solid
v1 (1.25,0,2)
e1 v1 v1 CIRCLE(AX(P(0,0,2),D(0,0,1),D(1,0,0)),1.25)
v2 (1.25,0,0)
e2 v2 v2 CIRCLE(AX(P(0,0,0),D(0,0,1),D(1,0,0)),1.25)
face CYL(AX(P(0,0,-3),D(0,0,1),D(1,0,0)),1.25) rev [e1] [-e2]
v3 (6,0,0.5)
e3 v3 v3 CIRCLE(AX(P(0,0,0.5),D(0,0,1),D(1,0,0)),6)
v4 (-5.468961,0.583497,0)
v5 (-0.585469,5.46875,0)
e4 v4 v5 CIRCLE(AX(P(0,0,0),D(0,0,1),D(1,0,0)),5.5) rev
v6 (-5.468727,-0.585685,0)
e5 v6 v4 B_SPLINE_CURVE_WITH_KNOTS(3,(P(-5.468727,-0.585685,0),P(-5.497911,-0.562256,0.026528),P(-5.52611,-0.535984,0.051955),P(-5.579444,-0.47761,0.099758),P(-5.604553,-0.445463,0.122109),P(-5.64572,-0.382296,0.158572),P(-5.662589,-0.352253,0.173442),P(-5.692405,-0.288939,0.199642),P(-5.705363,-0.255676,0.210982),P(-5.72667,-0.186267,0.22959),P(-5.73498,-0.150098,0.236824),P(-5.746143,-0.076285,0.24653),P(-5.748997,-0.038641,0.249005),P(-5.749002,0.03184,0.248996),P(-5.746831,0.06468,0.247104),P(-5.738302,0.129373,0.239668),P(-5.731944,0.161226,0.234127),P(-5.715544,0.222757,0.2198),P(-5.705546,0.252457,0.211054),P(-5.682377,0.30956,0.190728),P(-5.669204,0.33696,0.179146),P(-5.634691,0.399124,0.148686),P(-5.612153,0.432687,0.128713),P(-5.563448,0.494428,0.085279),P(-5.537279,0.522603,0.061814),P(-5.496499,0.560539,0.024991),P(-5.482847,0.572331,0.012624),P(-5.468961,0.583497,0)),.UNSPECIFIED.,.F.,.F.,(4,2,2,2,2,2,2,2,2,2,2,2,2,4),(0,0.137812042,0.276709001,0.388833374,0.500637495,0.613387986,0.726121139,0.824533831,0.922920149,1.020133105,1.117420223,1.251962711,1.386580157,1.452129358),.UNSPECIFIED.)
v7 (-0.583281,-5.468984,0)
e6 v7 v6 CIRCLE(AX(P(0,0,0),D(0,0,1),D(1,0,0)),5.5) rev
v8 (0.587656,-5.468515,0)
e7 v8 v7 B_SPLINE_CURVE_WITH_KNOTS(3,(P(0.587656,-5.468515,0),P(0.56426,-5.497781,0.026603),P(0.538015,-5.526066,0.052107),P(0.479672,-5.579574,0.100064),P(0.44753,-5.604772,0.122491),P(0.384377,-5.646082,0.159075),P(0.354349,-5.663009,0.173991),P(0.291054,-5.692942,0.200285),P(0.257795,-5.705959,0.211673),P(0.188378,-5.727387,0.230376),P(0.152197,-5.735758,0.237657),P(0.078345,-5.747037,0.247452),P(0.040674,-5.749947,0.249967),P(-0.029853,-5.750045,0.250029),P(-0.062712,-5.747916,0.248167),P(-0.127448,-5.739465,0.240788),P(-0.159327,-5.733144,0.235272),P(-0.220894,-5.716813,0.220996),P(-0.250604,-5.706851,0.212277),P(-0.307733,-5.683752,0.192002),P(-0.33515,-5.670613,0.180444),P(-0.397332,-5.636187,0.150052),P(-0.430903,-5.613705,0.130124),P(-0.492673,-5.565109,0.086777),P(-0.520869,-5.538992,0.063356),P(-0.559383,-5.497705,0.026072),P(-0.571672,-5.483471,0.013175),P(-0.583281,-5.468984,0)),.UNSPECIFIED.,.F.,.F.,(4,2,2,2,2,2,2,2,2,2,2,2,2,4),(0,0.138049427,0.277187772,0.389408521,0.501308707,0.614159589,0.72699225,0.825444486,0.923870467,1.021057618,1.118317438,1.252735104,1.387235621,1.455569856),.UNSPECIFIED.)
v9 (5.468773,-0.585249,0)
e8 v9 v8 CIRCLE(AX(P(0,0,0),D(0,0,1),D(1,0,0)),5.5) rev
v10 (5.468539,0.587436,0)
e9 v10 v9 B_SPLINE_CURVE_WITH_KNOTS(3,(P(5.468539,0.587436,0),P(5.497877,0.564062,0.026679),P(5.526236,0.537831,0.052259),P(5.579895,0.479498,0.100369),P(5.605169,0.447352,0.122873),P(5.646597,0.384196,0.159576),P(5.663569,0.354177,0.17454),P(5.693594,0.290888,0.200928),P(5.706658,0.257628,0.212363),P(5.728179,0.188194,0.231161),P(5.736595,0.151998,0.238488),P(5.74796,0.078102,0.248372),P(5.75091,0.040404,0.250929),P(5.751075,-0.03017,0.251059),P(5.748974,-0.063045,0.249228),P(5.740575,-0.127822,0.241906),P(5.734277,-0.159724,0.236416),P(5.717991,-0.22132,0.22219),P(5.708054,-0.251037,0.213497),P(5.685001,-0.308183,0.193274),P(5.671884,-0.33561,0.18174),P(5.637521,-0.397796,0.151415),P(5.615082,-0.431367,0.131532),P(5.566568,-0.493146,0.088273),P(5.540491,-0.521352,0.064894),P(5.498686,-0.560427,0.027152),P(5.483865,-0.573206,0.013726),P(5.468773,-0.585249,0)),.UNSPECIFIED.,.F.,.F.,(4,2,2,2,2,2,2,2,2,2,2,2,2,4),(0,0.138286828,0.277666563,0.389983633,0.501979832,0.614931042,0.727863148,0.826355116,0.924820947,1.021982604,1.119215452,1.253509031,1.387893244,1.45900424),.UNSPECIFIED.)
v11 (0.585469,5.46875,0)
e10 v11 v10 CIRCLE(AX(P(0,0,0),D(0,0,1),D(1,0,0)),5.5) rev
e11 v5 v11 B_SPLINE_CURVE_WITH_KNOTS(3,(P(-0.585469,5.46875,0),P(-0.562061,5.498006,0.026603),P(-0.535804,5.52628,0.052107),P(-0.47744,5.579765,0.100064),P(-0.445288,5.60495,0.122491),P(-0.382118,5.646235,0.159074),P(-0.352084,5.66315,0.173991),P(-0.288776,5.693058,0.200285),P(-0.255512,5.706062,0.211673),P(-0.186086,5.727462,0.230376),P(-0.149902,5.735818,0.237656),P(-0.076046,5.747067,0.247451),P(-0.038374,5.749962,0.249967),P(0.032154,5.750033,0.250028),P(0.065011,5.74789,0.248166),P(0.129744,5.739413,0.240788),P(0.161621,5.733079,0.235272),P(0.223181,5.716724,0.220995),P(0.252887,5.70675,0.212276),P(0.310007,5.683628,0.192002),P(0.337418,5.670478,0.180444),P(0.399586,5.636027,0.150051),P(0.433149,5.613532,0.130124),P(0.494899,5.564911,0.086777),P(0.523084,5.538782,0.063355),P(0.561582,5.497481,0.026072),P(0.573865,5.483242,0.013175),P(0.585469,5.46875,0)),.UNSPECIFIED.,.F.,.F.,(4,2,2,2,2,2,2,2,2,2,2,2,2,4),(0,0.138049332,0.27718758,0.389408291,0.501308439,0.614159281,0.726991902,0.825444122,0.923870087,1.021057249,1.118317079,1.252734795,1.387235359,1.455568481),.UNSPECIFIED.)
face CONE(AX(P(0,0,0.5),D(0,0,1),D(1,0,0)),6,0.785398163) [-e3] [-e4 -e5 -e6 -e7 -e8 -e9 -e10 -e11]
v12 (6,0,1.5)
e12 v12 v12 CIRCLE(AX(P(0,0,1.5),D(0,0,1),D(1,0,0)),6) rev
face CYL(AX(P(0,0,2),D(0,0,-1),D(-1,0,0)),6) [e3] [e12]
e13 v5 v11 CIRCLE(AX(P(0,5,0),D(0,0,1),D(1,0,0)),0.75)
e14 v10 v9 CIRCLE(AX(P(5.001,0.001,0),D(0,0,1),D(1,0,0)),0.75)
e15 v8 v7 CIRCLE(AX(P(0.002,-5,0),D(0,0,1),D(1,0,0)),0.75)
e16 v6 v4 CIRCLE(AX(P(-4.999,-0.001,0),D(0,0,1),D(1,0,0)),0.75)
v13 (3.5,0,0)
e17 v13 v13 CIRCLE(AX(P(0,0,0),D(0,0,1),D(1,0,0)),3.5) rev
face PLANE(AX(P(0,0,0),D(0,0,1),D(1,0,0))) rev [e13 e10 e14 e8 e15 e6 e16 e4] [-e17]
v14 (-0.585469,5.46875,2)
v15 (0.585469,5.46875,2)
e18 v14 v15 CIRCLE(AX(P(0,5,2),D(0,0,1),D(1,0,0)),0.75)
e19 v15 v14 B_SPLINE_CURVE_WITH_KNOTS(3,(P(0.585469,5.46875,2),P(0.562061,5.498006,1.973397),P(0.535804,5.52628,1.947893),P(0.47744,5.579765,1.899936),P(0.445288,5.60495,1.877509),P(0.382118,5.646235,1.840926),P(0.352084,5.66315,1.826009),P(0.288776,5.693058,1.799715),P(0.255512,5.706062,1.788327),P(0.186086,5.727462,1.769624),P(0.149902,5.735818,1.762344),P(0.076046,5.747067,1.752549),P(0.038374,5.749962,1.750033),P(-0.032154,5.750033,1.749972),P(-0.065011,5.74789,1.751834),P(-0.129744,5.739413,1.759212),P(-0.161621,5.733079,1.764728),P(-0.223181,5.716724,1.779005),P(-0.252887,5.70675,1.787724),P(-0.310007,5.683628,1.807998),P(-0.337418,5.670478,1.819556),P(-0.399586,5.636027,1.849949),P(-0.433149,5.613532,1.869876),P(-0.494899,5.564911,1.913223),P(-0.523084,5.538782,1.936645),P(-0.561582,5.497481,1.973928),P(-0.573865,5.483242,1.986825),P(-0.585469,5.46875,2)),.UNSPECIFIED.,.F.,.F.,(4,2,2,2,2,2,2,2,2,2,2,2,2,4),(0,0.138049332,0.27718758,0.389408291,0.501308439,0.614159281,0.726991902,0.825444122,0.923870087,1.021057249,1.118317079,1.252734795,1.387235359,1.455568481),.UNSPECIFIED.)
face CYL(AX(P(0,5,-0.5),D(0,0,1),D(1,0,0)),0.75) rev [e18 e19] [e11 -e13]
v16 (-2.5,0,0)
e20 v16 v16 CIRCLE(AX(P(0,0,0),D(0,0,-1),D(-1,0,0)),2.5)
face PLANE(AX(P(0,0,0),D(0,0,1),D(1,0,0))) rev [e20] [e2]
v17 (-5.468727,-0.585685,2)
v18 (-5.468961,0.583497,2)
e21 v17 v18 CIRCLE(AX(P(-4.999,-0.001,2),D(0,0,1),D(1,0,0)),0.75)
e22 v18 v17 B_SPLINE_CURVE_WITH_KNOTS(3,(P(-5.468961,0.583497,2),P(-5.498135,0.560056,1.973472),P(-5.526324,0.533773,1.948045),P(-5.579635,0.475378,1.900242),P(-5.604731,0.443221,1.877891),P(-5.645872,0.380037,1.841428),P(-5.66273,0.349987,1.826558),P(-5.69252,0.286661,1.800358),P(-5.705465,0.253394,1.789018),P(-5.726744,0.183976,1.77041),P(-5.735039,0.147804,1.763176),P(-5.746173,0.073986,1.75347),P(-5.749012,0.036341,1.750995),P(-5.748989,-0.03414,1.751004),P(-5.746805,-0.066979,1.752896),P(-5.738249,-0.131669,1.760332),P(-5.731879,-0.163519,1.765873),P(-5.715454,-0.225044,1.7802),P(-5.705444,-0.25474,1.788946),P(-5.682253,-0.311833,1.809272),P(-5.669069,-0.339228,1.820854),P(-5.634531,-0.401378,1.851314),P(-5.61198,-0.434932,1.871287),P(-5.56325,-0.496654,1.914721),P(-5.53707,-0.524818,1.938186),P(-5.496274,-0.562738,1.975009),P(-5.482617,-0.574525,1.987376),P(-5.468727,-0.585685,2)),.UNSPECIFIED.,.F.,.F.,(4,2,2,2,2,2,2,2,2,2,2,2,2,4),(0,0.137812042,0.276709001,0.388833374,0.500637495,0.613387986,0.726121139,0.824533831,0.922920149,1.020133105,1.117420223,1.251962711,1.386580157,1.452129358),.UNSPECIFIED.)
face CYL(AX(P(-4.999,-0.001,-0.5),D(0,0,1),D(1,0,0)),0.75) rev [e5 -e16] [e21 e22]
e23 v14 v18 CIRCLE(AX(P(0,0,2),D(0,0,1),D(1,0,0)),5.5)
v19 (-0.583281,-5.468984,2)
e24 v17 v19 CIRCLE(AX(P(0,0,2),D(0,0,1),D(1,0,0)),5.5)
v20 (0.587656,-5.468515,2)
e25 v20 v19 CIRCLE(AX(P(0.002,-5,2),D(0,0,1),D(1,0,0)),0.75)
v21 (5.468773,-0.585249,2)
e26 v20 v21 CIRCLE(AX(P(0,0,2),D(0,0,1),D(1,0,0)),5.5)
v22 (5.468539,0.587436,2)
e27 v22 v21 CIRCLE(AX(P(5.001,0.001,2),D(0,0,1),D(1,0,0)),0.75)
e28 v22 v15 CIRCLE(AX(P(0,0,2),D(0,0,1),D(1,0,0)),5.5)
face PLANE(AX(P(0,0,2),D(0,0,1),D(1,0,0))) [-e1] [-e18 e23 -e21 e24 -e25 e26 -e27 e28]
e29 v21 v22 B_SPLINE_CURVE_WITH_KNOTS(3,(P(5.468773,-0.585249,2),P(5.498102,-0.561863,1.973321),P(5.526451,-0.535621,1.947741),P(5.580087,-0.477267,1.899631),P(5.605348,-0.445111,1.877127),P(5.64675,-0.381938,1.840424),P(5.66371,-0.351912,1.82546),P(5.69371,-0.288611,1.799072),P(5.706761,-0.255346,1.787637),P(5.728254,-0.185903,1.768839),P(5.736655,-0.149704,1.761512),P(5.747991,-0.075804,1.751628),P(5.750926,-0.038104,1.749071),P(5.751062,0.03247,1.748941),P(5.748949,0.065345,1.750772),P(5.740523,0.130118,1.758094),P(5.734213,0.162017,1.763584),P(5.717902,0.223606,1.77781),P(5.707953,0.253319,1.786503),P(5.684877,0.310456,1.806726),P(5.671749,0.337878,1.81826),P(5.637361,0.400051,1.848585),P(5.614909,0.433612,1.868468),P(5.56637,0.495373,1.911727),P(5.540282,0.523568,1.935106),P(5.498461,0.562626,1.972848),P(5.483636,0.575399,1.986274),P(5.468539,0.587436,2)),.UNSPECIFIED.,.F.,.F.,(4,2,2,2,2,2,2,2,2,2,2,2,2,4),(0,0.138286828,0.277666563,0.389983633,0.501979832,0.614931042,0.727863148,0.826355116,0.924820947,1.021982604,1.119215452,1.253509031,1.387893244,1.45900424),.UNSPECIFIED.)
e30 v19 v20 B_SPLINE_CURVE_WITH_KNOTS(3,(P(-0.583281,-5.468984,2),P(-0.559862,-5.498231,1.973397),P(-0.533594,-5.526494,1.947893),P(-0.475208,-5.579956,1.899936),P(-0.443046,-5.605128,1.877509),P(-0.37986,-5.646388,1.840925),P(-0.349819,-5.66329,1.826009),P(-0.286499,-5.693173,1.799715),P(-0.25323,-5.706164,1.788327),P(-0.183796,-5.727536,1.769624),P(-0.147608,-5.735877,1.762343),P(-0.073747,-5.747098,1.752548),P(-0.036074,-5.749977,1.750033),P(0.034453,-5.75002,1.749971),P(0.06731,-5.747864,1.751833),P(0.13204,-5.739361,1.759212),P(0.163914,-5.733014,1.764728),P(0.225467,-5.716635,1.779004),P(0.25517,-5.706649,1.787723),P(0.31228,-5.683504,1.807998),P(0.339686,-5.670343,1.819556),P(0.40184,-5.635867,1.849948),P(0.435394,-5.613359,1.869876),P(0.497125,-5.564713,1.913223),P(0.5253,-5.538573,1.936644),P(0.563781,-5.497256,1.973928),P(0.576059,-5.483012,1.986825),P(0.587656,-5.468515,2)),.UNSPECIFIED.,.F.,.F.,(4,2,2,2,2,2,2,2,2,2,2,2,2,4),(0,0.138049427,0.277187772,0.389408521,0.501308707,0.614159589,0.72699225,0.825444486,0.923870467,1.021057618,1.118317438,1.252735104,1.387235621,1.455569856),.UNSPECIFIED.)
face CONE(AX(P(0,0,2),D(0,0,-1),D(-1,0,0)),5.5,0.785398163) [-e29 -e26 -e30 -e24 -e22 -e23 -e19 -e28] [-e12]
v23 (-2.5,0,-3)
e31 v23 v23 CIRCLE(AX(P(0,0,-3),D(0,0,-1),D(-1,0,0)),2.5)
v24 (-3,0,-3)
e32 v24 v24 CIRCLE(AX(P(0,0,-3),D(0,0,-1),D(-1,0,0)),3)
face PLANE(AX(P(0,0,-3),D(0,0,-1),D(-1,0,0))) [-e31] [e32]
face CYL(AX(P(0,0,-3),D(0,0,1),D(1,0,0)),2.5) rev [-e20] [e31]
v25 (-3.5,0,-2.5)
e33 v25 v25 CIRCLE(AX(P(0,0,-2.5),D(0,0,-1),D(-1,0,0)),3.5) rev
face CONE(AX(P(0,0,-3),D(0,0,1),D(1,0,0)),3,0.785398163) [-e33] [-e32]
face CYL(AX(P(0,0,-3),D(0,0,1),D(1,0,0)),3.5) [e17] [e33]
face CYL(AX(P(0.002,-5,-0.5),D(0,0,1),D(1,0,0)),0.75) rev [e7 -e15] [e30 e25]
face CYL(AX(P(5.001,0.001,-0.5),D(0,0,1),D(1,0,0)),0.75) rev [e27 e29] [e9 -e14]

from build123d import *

# Parameters (mm, degrees)
SKETCH1_R           = 6
BOSS_EXTRUDE1_DEPTH = 2
SKETCH2_R           = 3.5
SKETCH2_R_2         = 2.5
BOSS_EXTRUDE2_DEPTH = 3
SKETCH3_R           = 0.75
CUT_EXTRUDE1_DEPTH  = 2.5
CHAMFER1_SIZE       = 0.5
SKETCH5_R           = 1.25
CUT_EXTRUDE3_DEPTH  = 10.848857924


with BuildPart() as part:
    # Sketch1 → Boss-Extrude1 (new body)
    with BuildSketch(Plane.XY):
        Circle(SKETCH1_R)
    extrude(amount=BOSS_EXTRUDE1_DEPTH)

    # Sketch2 → Boss-Extrude2 (add)
    with BuildSketch(Plane(origin=(0, 0, 0), x_dir=(-1, 0, 0), z_dir=(0, 0, -1))):
        with Locations(Location((0, 0, 0), (0, 0, 180))):
            Circle(SKETCH2_R)
        Circle(SKETCH2_R_2, mode=Mode.SUBTRACT)
    extrude(amount=BOSS_EXTRUDE2_DEPTH)

    # Sketch3 → Cut-Extrude1 (cut)
    with BuildSketch(Plane.XY.offset(2)):
        with Locations((0, 5)):
            Circle(SKETCH3_R)
        with Locations((5.001, 0.001)):
            Circle(SKETCH3_R)
        with Locations((0.002, -5)):
            Circle(SKETCH3_R)
        with Locations((-4.999, -0.001)):
            Circle(SKETCH3_R)
    extrude(amount=-CUT_EXTRUDE1_DEPTH, mode=Mode.SUBTRACT)

    # Chamfer1
    # the kernel refuses this chamfer: 0.5 mm, written as the material it takes off along each edge
    with BuildSketch(Plane(origin=(0, 0, 0), x_dir=(1, 0, 0), z_dir=(0, -1, 0))) as chamfer1_piece_1:
        Polygon((6, CHAMFER1_SIZE), (6 - CHAMFER1_SIZE, 0), (6, 0), align=None)
    revolve(axis=Axis((0, 0, 0), (0, 0, 1)), mode=Mode.SUBTRACT)
    with BuildSketch(Plane(origin=(0, 0, 2), x_dir=(1, 0, 0), z_dir=(0, -1, 0))) as chamfer1_piece_2:
        Polygon((6, -CHAMFER1_SIZE), (6 - CHAMFER1_SIZE, 0), (6, 0), align=None)
    revolve(axis=Axis((0, 0, 2), (0, 0, 1)), mode=Mode.SUBTRACT)
    with BuildSketch(Plane(origin=(0, 0, -3), x_dir=(1, 0, 0), z_dir=(0, 1, 0))) as chamfer1_piece_3:
        Polygon((3.5, -CHAMFER1_SIZE), (3.5 - CHAMFER1_SIZE, 0), (3.5, 0), align=None)
    revolve(axis=Axis((0, 0, -3), (0, 0, -1)), mode=Mode.SUBTRACT)

    # Sketch5 → Cut-Extrude3 (cut, through all)
    with BuildSketch(Plane.XY.offset(2)):
        Circle(SKETCH5_R)
    extrude(amount=-CUT_EXTRUDE3_DEPTH, mode=Mode.SUBTRACT)


solid = part.part
